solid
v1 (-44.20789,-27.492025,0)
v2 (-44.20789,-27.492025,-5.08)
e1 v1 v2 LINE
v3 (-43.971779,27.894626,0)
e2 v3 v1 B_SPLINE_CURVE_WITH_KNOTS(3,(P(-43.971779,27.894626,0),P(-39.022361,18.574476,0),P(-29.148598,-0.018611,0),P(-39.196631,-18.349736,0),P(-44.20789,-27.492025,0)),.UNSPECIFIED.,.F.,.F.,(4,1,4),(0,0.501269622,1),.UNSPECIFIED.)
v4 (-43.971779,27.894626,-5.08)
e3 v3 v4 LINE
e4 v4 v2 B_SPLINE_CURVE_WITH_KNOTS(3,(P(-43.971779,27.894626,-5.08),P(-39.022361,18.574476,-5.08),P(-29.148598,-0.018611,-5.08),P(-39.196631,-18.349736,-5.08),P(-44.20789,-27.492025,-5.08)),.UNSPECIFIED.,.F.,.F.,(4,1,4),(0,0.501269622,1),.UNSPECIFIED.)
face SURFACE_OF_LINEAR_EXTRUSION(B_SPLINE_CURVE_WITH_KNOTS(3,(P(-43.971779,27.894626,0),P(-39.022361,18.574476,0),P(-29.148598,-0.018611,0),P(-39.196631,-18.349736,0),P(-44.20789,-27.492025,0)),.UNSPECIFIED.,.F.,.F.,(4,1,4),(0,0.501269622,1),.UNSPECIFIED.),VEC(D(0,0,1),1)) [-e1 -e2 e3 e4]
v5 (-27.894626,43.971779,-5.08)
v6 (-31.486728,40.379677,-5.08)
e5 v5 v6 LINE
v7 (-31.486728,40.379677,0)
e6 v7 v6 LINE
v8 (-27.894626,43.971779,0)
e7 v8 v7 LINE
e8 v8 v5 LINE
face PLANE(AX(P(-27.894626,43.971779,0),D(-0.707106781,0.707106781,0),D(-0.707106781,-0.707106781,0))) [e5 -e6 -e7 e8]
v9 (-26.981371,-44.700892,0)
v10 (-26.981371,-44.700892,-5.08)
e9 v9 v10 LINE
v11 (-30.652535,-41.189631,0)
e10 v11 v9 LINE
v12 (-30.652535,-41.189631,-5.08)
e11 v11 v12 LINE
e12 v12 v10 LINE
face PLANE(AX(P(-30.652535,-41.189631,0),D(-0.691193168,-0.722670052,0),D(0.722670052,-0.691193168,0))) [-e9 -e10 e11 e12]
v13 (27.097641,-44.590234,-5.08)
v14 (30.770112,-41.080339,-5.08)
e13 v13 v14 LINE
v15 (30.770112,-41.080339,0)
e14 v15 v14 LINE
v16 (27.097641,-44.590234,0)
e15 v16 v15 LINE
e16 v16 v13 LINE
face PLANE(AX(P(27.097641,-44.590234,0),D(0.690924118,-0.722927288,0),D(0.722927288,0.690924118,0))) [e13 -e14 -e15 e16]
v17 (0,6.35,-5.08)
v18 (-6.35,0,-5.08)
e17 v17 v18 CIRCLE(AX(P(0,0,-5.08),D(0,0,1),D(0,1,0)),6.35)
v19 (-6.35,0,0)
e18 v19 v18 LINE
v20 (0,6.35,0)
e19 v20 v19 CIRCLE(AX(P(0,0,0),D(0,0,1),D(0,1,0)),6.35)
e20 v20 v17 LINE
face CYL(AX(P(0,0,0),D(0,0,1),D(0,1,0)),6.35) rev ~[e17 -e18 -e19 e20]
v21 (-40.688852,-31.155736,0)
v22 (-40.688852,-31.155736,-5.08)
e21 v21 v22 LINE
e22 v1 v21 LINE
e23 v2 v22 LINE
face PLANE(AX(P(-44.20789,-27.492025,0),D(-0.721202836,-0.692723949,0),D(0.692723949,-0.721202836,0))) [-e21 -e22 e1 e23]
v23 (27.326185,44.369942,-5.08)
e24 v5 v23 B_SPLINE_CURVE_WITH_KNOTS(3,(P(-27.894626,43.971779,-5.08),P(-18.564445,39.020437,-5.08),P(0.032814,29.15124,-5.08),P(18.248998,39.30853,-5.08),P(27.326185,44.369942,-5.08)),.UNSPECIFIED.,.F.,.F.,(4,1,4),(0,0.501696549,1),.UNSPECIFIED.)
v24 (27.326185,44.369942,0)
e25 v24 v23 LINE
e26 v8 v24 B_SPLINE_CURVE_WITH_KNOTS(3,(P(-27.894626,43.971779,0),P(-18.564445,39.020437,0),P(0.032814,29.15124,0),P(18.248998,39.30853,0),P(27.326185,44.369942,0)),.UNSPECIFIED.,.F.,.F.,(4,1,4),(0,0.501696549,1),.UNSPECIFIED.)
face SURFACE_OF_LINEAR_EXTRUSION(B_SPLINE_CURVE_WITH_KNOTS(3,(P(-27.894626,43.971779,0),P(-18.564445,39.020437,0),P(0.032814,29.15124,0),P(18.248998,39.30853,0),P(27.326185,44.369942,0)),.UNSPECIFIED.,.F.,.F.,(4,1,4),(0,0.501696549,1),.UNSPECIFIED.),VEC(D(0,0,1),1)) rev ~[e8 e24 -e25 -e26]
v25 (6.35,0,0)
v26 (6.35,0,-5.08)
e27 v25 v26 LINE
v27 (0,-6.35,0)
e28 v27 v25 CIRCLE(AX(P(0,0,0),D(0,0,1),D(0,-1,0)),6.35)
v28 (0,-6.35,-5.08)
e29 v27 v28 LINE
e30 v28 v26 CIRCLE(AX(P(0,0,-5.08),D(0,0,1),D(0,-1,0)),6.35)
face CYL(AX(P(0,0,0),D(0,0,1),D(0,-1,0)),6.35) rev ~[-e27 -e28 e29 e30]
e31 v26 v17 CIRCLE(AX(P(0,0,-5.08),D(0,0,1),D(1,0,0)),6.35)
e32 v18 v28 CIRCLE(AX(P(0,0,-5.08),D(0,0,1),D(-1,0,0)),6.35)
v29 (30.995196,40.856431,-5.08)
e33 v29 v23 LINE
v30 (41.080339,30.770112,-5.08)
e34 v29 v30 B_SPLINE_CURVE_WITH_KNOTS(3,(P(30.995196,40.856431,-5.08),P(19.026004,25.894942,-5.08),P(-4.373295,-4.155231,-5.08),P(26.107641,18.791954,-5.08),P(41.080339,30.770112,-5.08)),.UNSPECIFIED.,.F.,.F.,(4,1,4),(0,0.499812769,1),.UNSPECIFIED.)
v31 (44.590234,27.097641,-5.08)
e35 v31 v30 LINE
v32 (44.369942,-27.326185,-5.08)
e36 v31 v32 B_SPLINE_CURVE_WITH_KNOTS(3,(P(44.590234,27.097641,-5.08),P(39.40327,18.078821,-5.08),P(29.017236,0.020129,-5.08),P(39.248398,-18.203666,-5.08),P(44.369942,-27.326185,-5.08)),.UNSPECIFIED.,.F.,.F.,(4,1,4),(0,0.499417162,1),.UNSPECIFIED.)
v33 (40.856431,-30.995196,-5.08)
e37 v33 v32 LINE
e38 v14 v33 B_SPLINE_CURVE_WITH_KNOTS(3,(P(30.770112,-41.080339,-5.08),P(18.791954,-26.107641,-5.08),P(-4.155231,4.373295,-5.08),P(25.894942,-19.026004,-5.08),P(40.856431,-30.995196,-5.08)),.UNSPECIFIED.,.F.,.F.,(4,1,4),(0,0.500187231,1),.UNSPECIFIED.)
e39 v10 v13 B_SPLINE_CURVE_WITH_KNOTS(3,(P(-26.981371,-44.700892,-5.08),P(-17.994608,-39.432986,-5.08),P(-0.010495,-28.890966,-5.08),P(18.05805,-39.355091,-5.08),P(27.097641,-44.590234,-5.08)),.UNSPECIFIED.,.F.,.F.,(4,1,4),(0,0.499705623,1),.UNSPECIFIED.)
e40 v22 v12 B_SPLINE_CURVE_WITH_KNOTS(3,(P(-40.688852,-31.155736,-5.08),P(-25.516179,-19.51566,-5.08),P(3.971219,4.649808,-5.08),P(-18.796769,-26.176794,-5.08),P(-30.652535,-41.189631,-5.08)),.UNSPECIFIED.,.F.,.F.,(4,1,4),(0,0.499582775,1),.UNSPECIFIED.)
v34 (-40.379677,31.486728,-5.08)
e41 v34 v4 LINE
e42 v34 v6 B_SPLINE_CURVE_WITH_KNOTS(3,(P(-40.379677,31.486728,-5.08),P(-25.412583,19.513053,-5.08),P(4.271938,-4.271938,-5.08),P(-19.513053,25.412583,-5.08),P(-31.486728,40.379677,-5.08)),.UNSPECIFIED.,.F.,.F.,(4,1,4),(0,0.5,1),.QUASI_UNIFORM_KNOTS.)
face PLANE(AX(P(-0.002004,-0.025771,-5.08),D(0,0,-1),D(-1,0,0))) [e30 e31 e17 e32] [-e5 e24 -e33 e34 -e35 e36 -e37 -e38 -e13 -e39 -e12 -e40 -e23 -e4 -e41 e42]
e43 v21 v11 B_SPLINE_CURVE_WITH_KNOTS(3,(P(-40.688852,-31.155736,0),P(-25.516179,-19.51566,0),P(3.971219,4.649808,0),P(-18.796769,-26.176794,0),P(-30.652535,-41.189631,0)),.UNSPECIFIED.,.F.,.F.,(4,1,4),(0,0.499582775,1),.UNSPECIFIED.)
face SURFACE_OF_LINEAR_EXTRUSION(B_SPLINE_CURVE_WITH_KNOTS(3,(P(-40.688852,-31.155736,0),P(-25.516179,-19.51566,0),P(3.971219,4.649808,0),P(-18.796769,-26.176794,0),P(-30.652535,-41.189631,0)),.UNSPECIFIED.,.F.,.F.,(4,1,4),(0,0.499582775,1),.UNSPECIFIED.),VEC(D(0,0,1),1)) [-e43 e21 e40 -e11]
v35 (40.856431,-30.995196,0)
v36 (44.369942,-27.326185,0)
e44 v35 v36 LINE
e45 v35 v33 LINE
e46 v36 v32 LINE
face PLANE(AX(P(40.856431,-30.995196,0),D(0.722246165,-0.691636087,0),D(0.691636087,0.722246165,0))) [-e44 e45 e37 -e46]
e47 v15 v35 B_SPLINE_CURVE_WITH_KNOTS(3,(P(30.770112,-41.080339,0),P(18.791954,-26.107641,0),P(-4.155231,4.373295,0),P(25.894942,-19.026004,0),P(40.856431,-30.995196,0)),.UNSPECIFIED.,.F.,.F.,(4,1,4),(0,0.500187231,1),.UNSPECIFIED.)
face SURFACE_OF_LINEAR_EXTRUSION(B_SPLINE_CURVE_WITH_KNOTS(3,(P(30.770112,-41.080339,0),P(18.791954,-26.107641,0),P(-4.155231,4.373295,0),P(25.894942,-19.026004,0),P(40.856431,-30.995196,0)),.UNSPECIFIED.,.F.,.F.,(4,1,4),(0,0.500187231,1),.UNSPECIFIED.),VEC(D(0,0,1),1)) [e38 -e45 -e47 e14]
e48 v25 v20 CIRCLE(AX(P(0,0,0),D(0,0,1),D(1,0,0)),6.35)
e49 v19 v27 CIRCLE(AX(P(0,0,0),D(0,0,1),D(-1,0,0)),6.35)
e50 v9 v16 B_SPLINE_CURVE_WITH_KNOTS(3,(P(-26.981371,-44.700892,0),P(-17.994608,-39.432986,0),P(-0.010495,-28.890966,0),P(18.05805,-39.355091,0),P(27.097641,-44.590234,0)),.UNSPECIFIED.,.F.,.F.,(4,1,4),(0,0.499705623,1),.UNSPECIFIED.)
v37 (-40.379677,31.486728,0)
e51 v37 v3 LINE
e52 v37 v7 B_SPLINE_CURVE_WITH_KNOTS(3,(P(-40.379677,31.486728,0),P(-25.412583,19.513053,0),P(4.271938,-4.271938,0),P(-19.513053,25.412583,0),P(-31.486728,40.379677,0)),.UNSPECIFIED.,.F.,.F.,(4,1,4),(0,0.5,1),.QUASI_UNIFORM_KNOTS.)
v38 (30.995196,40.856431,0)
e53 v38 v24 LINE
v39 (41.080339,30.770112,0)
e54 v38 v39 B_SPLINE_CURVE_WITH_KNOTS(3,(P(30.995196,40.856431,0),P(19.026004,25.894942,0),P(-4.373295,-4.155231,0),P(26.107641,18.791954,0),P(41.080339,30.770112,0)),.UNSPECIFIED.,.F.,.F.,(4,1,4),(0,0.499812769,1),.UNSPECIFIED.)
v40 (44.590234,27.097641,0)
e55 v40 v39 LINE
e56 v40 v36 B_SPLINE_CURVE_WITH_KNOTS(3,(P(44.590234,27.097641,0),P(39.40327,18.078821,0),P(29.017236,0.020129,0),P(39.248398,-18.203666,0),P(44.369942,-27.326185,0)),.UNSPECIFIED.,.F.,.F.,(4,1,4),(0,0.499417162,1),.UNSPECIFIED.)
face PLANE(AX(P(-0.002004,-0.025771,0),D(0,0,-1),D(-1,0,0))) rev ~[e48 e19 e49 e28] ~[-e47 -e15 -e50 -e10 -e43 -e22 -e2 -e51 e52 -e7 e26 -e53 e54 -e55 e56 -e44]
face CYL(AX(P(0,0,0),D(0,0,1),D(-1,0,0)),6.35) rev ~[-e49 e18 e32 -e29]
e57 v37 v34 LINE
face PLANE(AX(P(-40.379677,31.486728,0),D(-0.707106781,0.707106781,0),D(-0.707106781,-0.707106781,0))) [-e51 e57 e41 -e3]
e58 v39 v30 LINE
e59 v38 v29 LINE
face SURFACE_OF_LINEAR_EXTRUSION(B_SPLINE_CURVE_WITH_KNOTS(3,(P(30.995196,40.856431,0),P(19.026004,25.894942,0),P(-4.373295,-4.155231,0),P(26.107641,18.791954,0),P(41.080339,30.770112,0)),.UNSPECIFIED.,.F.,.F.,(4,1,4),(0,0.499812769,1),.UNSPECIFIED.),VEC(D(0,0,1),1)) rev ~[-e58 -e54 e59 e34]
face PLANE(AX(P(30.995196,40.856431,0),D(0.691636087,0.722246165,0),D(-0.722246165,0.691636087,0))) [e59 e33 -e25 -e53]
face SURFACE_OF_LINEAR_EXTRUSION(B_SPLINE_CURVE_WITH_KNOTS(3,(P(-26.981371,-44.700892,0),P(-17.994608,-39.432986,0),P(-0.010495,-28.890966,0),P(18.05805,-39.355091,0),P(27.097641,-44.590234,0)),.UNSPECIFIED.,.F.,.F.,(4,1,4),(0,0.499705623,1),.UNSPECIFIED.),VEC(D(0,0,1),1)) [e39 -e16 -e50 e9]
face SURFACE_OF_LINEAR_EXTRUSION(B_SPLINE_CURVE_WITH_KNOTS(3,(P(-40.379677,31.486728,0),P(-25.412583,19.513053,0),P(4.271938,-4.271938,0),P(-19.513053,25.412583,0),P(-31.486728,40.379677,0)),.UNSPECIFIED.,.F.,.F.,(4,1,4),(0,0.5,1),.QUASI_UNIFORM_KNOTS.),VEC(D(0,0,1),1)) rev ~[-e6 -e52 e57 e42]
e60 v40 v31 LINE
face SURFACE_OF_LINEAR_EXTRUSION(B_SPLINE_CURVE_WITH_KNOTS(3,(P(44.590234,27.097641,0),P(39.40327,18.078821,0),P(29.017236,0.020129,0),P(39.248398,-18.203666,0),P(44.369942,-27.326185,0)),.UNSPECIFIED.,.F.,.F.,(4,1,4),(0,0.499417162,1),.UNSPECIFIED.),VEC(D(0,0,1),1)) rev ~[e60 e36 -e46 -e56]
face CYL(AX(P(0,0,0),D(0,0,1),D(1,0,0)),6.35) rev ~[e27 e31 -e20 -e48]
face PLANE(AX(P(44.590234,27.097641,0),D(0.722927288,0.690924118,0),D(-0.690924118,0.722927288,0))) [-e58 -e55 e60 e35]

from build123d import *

# Parameters (mm, degrees)
F2_DEPTH = 5.08
F3_DEPTH = 5.08


with BuildPart() as f2:
    # F1 (on Top) → F2 (new body)
    with BuildSketch(Plane.XY):
        with BuildLine():
            add(Edge.make_bspline(
                [(-40.3796768019, 31.486727974), (-25.4125832668, 19.5130531459), (4.2719382832, -4.2719382832), (-19.5130531459, 25.4125832668), (-31.486727974, 40.3796768019)],
                knots=[0, 0, 0, 0, 0.5, 1, 1, 1, 1], degree=3))
            Line((-40.3796768019, 31.486727974), (-43.9717792504, 27.8946255256))
            add(Edge.make_bspline(
                [(-43.9717792504, 27.8946255256), (-39.0223614388, 18.5744758569), (-29.1485977035, -0.0186111101), (-39.1966306531, -18.3497362141), (-44.207889928, -27.4920251734)],
                knots=[0, 0, 0, 0, 0.5012696216, 1, 1, 1, 1], degree=3))
            Line((-44.207889928, -27.4920251734), (-40.688852268, -31.1557355805))
            add(Edge.make_bspline(
                [(-40.688852268, -31.1557355805), (-25.5161789229, -19.5156604784), (3.9712190003, 4.6498080898), (-18.7967685048, -26.1767940312), (-30.6525350904, -41.1896309485)],
                knots=[0, 0, 0, 0, 0.4995827747, 1, 1, 1, 1], degree=3))
            Line((-30.6525350904, -41.1896309485), (-26.9813712251, -44.7008922424))
            add(Edge.make_bspline(
                [(-26.9813712251, -44.7008922424), (-17.9946084514, -39.4329857114), (-0.010494669, -28.8909659837), (18.0580501184, -39.3550908644), (27.0976414843, -44.5902337071)],
                knots=[0, 0, 0, 0, 0.4997056226, 1, 1, 1, 1], degree=3))
            Line((27.0976414843, -44.5902337071), (30.7701121053, -41.0803391876))
            add(Edge.make_bspline(
                [(30.7701121053, -41.0803391876), (18.791953604, -26.107641061), (-4.1552313798, 4.3732948199), (25.8949419877, -19.0260044621), (40.8564309314, -30.995195617)],
                knots=[0, 0, 0, 0, 0.5001872305, 1, 1, 1, 1], degree=3))
            Line((40.8564309314, -30.995195617), (44.3699422534, -27.3261850978))
            add(Edge.make_bspline(
                [(44.5902337071, 27.0976414843), (39.403270189, 18.0788208761), (29.0172364099, 0.0201290891), (39.2483982347, -18.2036660263), (44.3699422534, -27.3261850978)],
                knots=[0, 0, 0, 0, 0.4994171624, 1, 1, 1, 1], degree=3))
            Line((44.5902337071, 27.0976414843), (41.0803391876, 30.7701121053))
            add(Edge.make_bspline(
                [(30.995195617, 40.8564309314), (19.0260044621, 25.8949419877), (-4.3732948199, -4.1552313798), (26.107641061, 18.791953604), (41.0803391876, 30.7701121053)],
                knots=[0, 0, 0, 0, 0.4998127695, 1, 1, 1, 1], degree=3))
            Line((30.995195617, 40.8564309314), (27.3261850978, 44.3699422534))
            add(Edge.make_bspline(
                [(-27.8946255256, 43.9717792504), (-18.5644448783, 39.0204369591), (0.0328141053, 29.1512395247), (18.2489978621, 39.3085295686), (27.3261850978, 44.3699422534)],
                knots=[0, 0, 0, 0, 0.5016965487, 1, 1, 1, 1], degree=3))
            Line((-27.8946255256, 43.9717792504), (-31.486727974, 40.3796768019))
        make_face()
    extrude(amount=-F2_DEPTH)

    # F0 (on Top) → F3 (cut, through all)
    with BuildSketch(Plane.XY):
        with BuildLine():
            ThreePointArc((0, -6.35), (4.4901280605, -4.4901280605), (6.35, 0))
            ThreePointArc((6.35, 0), (4.4901280605, 4.4901280605), (0, 6.35))
            ThreePointArc((0, 6.35), (-4.4901280605, 4.4901280605), (-6.35, 0))
            ThreePointArc((-6.35, 0), (-4.4901280605, -4.4901280605), (0, -6.35))
        make_face()
    extrude(amount=-F3_DEPTH, mode=Mode.SUBTRACT)


solid = f2.part
